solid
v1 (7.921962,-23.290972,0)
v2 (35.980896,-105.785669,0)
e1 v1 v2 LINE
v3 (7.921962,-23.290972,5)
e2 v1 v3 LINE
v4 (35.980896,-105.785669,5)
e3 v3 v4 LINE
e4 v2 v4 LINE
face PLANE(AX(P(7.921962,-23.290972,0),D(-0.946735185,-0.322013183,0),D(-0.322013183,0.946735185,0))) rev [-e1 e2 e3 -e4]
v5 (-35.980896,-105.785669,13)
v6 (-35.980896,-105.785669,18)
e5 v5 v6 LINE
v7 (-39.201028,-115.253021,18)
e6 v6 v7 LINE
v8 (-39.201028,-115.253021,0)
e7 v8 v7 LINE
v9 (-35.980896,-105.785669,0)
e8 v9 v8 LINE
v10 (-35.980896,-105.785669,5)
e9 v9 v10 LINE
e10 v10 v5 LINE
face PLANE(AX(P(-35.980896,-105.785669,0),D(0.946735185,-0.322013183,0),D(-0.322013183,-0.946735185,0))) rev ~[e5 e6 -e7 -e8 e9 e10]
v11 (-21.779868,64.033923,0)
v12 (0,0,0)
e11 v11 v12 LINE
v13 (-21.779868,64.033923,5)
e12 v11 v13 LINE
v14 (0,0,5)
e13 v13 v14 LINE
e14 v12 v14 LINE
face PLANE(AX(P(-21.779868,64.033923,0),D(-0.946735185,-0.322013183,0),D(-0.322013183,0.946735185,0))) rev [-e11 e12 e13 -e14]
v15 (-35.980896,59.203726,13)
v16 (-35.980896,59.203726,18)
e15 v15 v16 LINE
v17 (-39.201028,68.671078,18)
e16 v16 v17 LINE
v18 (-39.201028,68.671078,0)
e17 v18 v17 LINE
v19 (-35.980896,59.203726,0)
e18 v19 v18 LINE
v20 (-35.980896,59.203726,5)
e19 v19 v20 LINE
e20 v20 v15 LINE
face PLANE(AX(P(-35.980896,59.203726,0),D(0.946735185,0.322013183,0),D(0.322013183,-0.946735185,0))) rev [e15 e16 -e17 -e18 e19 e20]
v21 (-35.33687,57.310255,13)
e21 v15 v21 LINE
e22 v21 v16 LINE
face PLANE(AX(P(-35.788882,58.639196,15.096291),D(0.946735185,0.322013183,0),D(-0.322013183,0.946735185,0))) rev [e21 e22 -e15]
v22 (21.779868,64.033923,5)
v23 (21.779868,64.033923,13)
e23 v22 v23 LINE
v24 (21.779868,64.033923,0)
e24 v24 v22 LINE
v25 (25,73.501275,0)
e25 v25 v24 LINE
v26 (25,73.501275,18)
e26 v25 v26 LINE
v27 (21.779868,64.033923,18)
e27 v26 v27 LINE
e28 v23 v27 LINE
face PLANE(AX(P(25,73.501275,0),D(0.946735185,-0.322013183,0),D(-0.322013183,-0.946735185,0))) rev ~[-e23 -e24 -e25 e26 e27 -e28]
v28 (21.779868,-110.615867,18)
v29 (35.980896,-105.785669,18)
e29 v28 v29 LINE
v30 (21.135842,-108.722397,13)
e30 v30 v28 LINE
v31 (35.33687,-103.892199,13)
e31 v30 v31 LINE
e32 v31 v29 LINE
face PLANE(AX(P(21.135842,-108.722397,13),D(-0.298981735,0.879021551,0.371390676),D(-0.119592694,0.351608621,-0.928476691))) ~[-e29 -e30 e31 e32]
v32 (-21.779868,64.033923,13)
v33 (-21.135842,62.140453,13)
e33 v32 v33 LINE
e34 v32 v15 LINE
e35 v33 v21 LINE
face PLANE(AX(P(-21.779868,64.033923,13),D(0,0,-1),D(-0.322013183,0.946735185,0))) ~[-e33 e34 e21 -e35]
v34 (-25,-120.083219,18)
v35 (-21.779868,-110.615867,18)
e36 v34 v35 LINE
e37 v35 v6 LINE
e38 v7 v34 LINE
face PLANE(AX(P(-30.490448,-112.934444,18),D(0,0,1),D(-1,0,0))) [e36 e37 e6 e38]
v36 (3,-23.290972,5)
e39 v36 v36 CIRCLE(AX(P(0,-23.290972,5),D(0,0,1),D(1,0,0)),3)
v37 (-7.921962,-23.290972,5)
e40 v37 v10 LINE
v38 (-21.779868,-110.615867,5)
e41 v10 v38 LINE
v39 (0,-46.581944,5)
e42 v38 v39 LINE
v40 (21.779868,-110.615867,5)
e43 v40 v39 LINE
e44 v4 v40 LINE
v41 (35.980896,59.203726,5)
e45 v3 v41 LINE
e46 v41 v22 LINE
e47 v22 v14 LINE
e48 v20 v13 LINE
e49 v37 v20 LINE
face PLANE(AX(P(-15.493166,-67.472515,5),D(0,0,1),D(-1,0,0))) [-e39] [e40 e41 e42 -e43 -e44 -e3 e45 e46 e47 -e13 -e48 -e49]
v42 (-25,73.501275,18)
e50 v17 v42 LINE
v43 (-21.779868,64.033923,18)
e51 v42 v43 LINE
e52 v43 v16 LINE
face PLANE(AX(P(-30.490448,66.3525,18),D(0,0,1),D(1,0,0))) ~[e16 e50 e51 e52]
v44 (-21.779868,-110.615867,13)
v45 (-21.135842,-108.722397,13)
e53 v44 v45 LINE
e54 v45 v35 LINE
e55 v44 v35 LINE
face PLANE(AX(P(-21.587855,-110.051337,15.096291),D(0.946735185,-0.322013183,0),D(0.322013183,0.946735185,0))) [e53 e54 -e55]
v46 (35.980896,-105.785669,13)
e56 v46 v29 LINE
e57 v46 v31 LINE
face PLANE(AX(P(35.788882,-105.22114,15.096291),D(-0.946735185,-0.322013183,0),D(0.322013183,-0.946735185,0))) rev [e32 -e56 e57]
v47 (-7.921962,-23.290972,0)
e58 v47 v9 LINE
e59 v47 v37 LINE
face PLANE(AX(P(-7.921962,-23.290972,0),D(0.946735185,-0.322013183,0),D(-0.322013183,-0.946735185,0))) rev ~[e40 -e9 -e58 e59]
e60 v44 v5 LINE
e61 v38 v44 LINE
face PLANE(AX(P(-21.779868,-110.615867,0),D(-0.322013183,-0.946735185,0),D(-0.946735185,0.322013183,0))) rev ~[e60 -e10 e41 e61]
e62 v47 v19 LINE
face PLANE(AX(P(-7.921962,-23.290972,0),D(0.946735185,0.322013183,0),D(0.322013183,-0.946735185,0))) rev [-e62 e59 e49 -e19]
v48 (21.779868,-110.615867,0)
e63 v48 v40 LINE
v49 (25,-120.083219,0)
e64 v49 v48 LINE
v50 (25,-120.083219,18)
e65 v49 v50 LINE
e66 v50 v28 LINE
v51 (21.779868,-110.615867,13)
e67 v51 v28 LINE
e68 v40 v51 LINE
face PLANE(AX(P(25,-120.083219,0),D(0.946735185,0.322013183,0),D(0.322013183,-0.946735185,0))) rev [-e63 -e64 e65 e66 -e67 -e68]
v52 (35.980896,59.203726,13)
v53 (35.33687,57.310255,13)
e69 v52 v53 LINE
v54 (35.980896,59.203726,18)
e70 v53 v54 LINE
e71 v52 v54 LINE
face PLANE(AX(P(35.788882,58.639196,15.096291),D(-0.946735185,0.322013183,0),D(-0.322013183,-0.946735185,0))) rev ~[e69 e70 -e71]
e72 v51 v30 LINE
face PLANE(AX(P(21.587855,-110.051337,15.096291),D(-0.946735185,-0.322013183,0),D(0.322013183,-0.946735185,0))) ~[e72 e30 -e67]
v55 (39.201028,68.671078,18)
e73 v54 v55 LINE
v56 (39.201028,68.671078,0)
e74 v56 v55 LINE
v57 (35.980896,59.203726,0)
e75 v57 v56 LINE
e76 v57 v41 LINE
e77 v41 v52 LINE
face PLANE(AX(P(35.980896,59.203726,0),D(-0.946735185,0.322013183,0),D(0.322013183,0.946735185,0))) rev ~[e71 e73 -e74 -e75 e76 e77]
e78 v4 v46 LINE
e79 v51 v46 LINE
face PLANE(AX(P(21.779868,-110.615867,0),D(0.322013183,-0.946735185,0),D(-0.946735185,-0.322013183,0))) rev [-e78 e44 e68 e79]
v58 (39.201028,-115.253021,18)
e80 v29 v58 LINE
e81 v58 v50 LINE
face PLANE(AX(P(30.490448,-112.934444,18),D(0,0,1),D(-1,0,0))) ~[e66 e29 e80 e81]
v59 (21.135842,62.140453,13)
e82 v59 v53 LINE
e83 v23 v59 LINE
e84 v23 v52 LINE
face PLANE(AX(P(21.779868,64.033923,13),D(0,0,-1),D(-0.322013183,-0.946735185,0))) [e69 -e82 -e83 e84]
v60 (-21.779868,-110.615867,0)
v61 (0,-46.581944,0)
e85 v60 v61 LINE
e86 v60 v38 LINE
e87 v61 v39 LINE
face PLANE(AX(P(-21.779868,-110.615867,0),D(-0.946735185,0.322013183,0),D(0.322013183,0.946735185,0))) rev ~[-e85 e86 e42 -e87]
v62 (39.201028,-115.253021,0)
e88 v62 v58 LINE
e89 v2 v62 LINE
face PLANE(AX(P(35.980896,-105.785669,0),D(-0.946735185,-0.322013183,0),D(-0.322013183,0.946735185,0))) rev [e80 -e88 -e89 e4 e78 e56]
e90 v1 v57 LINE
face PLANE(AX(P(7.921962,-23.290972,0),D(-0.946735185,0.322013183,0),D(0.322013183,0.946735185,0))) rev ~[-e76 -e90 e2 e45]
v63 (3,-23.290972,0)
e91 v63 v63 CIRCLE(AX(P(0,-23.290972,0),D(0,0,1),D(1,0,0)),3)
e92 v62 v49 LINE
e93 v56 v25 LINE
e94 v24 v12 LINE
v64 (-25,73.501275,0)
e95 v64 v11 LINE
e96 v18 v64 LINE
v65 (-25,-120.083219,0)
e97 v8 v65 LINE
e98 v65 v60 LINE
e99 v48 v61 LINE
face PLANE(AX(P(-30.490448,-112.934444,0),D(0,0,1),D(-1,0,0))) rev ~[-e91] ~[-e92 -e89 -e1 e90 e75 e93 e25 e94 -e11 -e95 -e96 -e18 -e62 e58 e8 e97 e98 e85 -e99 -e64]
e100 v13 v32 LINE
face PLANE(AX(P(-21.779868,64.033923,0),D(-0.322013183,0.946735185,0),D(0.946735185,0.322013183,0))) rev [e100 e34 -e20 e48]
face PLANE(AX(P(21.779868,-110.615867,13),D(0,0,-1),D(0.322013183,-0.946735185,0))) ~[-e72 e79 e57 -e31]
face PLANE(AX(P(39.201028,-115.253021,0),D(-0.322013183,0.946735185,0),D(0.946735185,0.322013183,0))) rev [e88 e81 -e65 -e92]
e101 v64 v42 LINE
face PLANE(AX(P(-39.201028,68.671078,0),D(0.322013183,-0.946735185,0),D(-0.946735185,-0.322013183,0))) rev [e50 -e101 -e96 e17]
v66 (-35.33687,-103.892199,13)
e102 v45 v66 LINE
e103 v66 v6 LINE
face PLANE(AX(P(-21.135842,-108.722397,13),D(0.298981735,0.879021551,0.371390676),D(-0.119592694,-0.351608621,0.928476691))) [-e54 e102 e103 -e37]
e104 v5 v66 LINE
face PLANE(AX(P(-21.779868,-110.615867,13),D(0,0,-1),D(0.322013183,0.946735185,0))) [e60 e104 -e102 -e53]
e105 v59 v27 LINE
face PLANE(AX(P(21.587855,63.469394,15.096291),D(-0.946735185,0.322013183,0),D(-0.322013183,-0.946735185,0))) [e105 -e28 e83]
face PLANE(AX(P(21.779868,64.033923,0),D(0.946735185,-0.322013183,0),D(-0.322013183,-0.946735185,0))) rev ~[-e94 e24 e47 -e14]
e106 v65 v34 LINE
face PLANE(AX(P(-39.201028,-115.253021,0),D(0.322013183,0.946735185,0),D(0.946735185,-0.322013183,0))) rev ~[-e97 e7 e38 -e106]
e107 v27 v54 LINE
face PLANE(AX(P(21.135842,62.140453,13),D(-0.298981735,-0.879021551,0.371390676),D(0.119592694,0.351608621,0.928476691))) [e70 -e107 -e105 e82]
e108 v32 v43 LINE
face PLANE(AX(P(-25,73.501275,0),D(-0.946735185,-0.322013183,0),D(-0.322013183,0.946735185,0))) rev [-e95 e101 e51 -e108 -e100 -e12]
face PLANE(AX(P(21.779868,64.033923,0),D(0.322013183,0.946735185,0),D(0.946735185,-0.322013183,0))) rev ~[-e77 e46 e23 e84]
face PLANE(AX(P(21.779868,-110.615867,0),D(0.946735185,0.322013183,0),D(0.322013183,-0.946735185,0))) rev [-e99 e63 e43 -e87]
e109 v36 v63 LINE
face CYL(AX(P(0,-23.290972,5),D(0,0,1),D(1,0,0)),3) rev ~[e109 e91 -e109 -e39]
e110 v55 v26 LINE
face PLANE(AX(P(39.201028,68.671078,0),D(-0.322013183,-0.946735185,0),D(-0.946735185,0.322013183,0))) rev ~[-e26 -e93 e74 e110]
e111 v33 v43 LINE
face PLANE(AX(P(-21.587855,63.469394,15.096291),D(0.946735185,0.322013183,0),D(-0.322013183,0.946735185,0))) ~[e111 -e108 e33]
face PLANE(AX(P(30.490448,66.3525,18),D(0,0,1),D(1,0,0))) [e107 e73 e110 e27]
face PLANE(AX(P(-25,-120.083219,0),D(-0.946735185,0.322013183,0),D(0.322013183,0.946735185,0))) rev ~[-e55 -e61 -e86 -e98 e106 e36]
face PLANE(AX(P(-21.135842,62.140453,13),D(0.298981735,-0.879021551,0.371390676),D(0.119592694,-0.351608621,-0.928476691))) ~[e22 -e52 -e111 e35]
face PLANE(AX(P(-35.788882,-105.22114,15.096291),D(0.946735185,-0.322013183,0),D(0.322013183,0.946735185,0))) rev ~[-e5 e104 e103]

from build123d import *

# Parameters (mm, degrees)
F7_DEPTH = 5
F0_DEPTH = 18
F2_DEPTH = 15
F5_R     = 3
F8_DEPTH = 25


# Not quite as in the source:
# - a feature names something its author has since deleted; it is built from what else it names


with BuildPart() as f7:
    # F6 (on Top) → F7 (new body)
    with BuildSketch(Plane.XY):
        Polygon((0, -23.2909718978), (7.9219618343, -23.2909718978), (35.9808959381, 59.2037256741), (21.7798681683, 64.0339234217), (0, 0), align=None)
    extrude(amount=F7_DEPTH)

    # F6 (on Top) → F0 (join)
    with BuildSketch(Plane.XY):
        Polygon((21.7798681683, 64.0339234217), (35.9808959381, 59.2037256741), (39.2010277698, 68.6710775207), (25, 73.5012752683), align=None)
    extrude(amount=F0_DEPTH)

    # F1 (on face) → F2 (join, through all)
    with BuildSketch(Plane(origin=(0, 0, 0), x_dir=(-0.3220131832, -0.9467351847, 0), z_dir=(-0.9467351847, 0.3220131832, 0))):
        Polygon((-65.6365729928, 13), (-67.6365729928, 18), (-67.6365729928, 13), align=None)
    extrude(amount=-F2_DEPTH)

    # F3: F7 across face


with BuildPart() as f7_1:
    add(f7.part)
    add(f7.part.mirror(Plane(origin=(0, -11.6454859489, 2.5), x_dir=(0, -1, 0), z_dir=(-1, 0, 0))))

    # F4: F7 across face


with BuildPart() as f7_2:
    add(f7_1.part)
    add(f7_1.part.mirror(Plane(origin=(0, -23.2909718978, 2.5), x_dir=(1, 0, 0), z_dir=(0, -1, 0))))

    # F5 (on face) → F8 (cut)
    with BuildSketch(Plane.XY.offset(5)):
        with Locations((0, -23.2909718978)):
            Circle(F5_R)
    extrude(amount=-F8_DEPTH, mode=Mode.SUBTRACT)


solid = f7_2.part
